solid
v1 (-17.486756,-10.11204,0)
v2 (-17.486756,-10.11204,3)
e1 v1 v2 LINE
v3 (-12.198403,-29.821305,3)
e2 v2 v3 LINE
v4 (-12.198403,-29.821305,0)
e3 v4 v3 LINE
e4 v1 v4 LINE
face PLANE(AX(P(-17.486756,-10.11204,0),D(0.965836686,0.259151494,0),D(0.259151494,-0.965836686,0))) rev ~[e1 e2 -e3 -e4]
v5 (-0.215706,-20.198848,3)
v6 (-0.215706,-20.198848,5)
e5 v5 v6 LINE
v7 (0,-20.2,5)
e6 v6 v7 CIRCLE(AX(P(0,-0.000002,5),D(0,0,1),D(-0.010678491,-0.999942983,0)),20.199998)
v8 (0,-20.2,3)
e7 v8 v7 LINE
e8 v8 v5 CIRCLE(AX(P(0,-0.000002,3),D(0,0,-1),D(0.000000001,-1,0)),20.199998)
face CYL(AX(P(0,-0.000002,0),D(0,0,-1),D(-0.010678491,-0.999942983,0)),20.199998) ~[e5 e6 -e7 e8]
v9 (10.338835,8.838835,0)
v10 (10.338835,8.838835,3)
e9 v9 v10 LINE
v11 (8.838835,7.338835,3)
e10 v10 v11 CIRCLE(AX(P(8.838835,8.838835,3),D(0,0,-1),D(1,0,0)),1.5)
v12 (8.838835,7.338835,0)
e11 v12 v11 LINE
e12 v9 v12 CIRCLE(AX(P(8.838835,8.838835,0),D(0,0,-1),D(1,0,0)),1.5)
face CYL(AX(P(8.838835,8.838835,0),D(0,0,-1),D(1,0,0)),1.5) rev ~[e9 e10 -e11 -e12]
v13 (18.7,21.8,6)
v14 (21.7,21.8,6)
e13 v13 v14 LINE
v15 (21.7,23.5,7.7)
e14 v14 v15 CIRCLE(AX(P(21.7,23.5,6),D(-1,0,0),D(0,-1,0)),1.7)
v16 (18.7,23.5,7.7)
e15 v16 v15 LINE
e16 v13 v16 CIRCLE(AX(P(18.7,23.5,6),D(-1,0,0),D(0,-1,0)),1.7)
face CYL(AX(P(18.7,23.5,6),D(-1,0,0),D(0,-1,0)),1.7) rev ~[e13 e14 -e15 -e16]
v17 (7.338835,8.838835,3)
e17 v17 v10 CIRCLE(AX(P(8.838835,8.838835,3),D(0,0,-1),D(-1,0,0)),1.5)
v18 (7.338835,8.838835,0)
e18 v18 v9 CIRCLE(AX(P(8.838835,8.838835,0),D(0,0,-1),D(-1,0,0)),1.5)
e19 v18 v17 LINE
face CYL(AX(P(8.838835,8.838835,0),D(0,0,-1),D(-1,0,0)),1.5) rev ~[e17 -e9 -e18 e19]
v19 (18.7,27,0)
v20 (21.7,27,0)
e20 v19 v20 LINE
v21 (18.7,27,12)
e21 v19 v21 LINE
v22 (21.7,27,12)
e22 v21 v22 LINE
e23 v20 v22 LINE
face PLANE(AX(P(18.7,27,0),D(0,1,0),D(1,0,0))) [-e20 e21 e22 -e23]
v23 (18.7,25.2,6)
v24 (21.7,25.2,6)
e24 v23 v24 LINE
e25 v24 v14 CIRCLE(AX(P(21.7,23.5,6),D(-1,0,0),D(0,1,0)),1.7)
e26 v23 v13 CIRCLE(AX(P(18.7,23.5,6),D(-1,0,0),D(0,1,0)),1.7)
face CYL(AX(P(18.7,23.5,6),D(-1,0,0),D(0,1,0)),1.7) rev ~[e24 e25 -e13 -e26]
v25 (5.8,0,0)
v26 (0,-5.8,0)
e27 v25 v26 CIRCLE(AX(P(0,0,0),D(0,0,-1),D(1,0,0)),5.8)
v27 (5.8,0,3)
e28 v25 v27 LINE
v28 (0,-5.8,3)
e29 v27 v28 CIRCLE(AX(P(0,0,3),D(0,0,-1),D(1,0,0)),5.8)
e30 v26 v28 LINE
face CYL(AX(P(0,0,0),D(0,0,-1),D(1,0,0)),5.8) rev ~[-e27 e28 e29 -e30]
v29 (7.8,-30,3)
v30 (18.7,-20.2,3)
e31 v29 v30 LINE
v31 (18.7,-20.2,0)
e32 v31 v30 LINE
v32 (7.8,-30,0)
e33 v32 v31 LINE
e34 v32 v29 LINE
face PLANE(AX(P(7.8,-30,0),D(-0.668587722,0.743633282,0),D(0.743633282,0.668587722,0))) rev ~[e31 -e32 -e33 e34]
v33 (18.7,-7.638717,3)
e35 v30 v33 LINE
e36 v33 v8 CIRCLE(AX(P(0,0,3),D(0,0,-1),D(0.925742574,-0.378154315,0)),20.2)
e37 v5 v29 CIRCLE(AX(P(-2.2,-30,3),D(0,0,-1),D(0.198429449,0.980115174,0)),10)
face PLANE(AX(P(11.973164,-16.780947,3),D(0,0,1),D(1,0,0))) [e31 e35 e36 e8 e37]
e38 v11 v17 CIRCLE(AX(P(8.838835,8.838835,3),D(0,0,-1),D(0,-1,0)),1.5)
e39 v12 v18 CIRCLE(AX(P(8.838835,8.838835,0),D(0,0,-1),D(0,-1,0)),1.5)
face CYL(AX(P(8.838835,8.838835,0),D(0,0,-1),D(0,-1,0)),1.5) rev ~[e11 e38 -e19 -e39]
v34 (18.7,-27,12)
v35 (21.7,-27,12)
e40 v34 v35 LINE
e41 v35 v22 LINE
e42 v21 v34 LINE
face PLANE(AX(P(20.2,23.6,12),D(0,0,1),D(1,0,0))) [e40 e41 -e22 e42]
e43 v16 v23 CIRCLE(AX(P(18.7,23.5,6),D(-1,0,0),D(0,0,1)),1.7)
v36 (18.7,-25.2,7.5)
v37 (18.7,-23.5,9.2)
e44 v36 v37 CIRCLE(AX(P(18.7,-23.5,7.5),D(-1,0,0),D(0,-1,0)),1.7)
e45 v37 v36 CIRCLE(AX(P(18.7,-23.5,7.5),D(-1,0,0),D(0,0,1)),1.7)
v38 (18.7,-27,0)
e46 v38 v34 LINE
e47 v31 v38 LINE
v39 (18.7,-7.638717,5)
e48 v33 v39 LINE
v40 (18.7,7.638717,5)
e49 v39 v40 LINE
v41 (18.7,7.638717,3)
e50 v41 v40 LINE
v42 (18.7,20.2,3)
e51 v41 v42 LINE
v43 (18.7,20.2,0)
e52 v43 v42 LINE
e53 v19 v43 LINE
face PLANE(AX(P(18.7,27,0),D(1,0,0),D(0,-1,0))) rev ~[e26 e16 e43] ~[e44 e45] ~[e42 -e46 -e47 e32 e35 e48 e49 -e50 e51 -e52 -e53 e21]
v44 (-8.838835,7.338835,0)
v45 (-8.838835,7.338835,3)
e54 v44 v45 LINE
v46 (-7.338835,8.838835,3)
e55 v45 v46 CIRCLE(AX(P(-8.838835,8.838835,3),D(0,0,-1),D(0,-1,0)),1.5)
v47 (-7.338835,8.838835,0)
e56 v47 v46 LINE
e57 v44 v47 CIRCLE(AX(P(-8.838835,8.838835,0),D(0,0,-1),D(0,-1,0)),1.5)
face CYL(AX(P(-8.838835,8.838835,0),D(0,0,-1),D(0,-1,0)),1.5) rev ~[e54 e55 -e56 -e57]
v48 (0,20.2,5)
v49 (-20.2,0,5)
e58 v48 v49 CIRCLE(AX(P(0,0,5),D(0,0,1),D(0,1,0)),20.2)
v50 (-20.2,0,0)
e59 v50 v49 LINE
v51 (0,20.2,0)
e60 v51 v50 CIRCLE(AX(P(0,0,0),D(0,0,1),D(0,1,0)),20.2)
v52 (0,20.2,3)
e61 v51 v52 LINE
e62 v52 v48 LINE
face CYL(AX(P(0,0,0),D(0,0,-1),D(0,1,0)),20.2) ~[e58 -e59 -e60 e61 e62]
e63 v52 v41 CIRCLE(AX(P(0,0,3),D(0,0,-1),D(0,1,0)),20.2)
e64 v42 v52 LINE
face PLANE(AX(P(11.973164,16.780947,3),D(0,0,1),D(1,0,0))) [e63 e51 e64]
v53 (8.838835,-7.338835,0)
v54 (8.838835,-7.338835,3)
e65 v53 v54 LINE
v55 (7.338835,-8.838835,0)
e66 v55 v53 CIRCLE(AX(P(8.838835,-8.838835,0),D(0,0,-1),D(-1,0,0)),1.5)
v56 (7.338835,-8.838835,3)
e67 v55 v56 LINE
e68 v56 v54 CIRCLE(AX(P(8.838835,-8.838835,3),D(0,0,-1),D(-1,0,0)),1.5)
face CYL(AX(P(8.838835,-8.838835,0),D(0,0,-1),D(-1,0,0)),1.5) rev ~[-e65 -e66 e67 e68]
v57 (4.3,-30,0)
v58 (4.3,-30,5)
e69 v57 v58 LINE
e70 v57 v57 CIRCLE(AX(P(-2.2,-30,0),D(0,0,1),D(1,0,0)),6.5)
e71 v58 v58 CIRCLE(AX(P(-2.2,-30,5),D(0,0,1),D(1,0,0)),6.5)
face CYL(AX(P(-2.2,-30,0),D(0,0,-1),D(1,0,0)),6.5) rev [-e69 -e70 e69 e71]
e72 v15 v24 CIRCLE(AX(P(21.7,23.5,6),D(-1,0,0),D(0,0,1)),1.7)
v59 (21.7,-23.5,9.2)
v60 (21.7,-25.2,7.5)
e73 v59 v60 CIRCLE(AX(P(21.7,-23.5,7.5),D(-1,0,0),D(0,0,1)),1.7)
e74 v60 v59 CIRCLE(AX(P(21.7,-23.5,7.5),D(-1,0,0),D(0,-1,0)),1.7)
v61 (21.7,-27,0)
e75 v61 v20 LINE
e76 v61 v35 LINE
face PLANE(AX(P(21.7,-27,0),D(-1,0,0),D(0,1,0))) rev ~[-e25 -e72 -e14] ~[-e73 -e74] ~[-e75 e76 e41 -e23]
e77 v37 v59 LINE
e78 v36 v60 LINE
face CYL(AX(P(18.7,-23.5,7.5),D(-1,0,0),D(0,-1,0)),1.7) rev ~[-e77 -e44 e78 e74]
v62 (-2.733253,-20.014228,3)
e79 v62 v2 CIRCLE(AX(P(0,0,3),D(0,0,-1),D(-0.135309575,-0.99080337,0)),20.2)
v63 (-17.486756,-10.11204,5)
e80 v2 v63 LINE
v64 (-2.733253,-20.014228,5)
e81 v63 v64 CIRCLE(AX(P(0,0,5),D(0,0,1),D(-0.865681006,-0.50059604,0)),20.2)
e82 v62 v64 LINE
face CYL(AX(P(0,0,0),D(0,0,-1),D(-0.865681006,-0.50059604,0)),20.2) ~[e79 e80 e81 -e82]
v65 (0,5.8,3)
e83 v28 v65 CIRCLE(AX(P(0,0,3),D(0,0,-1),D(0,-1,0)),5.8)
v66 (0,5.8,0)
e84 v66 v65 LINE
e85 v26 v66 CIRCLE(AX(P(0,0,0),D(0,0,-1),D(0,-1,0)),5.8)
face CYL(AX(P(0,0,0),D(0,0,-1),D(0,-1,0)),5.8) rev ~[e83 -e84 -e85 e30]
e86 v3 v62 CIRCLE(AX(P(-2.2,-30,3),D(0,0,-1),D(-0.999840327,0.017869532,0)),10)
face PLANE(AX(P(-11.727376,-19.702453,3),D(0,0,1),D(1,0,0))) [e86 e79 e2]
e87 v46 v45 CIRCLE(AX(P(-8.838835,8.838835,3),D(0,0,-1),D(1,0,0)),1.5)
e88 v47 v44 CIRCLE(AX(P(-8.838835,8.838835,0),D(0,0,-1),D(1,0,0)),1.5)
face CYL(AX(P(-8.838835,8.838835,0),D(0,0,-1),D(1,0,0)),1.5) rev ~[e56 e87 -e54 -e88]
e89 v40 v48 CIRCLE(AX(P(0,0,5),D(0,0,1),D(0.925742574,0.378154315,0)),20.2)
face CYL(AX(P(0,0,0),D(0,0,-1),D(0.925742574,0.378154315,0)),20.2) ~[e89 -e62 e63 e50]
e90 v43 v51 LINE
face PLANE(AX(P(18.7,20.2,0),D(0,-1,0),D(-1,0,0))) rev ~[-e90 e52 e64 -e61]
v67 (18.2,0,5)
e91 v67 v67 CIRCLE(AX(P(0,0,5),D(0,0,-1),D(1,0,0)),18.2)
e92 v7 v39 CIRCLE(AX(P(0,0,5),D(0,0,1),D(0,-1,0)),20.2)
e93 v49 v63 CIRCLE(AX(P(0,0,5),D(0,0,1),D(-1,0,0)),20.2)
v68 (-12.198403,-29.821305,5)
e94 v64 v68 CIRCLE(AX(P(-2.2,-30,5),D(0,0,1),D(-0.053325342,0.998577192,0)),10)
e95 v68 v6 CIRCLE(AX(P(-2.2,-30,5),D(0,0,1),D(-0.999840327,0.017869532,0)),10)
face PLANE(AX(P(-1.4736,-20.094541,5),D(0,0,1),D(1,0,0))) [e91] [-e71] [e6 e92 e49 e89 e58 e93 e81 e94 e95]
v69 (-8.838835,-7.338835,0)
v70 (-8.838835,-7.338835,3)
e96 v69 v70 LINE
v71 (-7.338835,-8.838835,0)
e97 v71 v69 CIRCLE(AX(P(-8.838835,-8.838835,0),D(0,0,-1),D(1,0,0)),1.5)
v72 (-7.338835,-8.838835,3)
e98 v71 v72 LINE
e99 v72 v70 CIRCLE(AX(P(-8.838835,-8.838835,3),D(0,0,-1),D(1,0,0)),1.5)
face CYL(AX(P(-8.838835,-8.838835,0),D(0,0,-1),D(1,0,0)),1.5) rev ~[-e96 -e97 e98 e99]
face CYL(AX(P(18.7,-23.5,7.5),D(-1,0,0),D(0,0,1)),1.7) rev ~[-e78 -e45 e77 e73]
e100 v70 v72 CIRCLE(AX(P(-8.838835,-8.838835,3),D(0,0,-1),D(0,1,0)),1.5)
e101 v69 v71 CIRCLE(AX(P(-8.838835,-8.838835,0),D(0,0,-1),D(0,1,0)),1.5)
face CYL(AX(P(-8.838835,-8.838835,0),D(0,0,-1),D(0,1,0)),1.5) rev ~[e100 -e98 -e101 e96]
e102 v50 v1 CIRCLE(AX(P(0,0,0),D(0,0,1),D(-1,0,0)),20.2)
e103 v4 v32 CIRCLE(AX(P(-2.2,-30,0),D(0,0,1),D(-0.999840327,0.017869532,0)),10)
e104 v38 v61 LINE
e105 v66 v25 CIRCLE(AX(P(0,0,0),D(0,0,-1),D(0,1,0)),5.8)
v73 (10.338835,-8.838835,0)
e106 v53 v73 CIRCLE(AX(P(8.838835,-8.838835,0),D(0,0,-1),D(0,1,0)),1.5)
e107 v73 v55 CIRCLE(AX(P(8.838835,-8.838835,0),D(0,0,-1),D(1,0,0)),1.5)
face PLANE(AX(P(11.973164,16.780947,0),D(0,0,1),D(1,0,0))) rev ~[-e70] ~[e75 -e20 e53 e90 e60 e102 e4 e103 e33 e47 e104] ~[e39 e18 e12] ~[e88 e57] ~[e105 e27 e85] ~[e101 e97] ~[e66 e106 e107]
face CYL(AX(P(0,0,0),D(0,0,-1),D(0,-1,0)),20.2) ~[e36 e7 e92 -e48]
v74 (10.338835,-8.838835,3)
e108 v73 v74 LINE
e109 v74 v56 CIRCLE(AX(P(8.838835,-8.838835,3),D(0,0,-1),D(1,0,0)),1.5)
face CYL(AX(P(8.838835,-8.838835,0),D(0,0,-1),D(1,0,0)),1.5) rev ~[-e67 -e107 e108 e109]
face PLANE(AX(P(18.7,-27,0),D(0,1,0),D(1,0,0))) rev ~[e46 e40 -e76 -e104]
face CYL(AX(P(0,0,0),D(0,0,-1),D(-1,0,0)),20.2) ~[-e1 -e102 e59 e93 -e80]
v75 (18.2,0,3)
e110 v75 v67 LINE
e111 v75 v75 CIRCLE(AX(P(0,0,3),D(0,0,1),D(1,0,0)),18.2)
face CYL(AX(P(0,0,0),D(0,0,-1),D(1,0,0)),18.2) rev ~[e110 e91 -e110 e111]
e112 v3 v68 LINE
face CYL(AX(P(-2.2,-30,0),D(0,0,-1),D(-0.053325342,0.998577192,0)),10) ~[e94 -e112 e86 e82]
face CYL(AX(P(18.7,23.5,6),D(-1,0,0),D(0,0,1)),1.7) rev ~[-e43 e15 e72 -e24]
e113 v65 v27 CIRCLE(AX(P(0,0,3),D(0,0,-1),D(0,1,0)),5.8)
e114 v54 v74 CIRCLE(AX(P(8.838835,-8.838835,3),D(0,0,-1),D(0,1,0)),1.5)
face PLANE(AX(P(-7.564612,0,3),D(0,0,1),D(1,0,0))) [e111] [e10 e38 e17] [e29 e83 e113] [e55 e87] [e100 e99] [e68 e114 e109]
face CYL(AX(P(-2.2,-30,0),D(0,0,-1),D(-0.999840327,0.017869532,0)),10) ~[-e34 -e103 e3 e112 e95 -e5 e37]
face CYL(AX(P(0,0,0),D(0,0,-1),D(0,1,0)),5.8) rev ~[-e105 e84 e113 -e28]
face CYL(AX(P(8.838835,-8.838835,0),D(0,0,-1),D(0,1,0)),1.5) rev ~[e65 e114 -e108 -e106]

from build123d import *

# Parameters (mm, degrees)
F0_W     = 3
F0_H     = 6.8
F1_DEPTH = 12
F2_DEPTH = 5
F3_DEPTH = 3
F0_R     = 6.5
F4_DEPTH = 5
F5_DEPTH = 3
F7_DEPTH = 25
F8_DEPTH = 25
F9_DEPTH = 3


with BuildPart() as f1:
    # F0 (on Top) → F1 (new body)
    with BuildSketch(Plane.XY):
        with Locations((20.2, 23.6)):
            Rectangle(F0_W, F0_H)
        with BuildLine():
            Line((18.7, 20.2), (18.7, 7.6387171698))
            ThreePointArc((18.7, 7.6387171698), (19.8214530244, 3.8923000912), (20.2, 0))
            Line((20.2, 0), (21.7, 0))
            Line((21.7, 0), (21.7, 20.2))
            Line((21.7, 20.2), (18.7, 20.2))
        make_face()
        with BuildLine():
            Line((21.7, 0), (20.2, 0))
            ThreePointArc((20.2, 0), (19.8214530244, -3.8923000912), (18.7, -7.6387171698))
            Line((18.7, -7.6387171698), (18.7, -20.2))
            Line((18.7, -20.2), (21.7, -20.2))
            Line((21.7, -20.2), (21.7, 0))
        make_face()
        with Locations((20.2, -23.6)):
            Rectangle(F0_W, F0_H)
        with BuildLine():
            ThreePointArc((20.2, 0), (19.8214530244, 3.8923000912), (18.7, 7.6387171698))
            Line((18.7, 7.6387171698), (18.7, 0))
            Line((18.7, 0), (20.2, 0))
        make_face()
        with BuildLine():
            ThreePointArc((18.7, -7.6387171698), (19.8214530244, -3.8923000912), (20.2, 0))
            Line((20.2, 0), (18.7, 0))
            Line((18.7, 0), (18.7, -7.6387171698))
        make_face()
    extrude(amount=F1_DEPTH)

    # F0 (on Top) → F2 (join)
    with BuildSketch(Plane.XY):
        with BuildLine():
            Line((0, 18.2), (0, 20.2))
            ThreePointArc((0, 20.2), (-14.28355698, 14.28355698), (-20.2, 0))
            Line((-20.2, 0), (-17.4867563263, -10.1120400111))
            ThreePointArc((-17.4867563263, -10.1120400111), (-11.2572434768, -16.7724318244), (-2.7332534209, -20.0142280825))
            ThreePointArc((-2.7332534209, -20.0142280825), (-1.4686306009, -20.0267809208), (-0.215705511, -20.1988482625))
            ThreePointArc((-0.215705511, -20.1988482625), (-0.1078542929, -20.1997120636), (0, -20.2))
            Line((0, -20.2), (0, -18.2))
            ThreePointArc((0, -18.2), (-18.2, 0), (0, 18.2))
        make_face()
        with BuildLine():
            ThreePointArc((18.7, 7.6387171698), (11.2636120576, 16.7681556355), (0, 20.2))
            Line((0, 20.2), (0, 18.2))
            ThreePointArc((0, 18.2), (12.8693434176, 12.8693434176), (18.2, 0))
            ThreePointArc((18.2, 0), (12.8693434176, -12.8693434176), (0, -18.2))
            Line((0, -18.2), (0, -20.2))
            ThreePointArc((0, -20.2), (11.2636120576, -16.7681556355), (18.7, -7.6387171698))
            Line((18.7, -7.6387171698), (18.7, 0))
            Line((18.7, 0), (18.7, 7.6387171698))
        make_face()
        with BuildLine():
            Line((-17.4867563263, -10.1120400111), (-20.2, 0))
            ThreePointArc((-20.2, 0), (-19.5099010478, -5.23486018), (-17.4867563263, -10.1120400111))
        make_face()
    extrude(amount=F2_DEPTH)

    # F0 (on Top) → F3 (join)
    with BuildSketch(Plane.XY):
        with BuildLine():
            Line((0, 8.8388347648), (0, 18.2))
            ThreePointArc((0, 18.2), (-18.2, 0), (0, -18.2))
            Line((0, -18.2), (0, -8.8388347648))
            Line((0, -8.8388347648), (-7.3388347648, -8.8388347648))
            ThreePointArc((-7.3388347648, -8.8388347648), (-9.8994949366, -9.8994949366), (-8.8388347648, -7.3388347648))
            Line((-8.8388347648, -7.3388347648), (-8.8388347648, 7.3388347648))
            ThreePointArc((-8.8388347648, 7.3388347648), (-9.8994949366, 9.8994949366), (-7.3388347648, 8.8388347648))
            Line((-7.3388347648, 8.8388347648), (0, 8.8388347648))
        make_face()
        with BuildLine():
            Line((7.3388347648, 8.8388347648), (0, 8.8388347648))
            Line((0, 8.8388347648), (0, 5.8))
            ThreePointArc((0, 5.8), (4.1012193309, 4.1012193309), (5.8, 0))
            ThreePointArc((5.8, 0), (4.1012193309, -4.1012193309), (0, -5.8))
            Line((0, -5.8), (0, -8.8388347648))
            Line((0, -8.8388347648), (7.3388347648, -8.8388347648))
            ThreePointArc((7.3388347648, -8.8388347648), (7.7781745931, -7.7781745931), (8.8388347648, -7.3388347648))
            Line((8.8388347648, -7.3388347648), (8.8388347648, 7.3388347648))
            ThreePointArc((8.8388347648, 7.3388347648), (7.7781745931, 7.7781745931), (7.3388347648, 8.8388347648))
        make_face()
        with BuildLine():
            Line((0, 5.8), (0, 8.8388347648))
            Line((0, 8.8388347648), (-7.3388347648, 8.8388347648))
            ThreePointArc((-7.3388347648, 8.8388347648), (-7.7781745931, 7.7781745931), (-8.8388347648, 7.3388347648))
            Line((-8.8388347648, 7.3388347648), (-8.8388347648, -7.3388347648))
            ThreePointArc((-8.8388347648, -7.3388347648), (-7.7781745931, -7.7781745931), (-7.3388347648, -8.8388347648))
            Line((-7.3388347648, -8.8388347648), (0, -8.8388347648))
            Line((0, -8.8388347648), (0, -5.8))
            ThreePointArc((0, -5.8), (-5.8, 0), (0, 5.8))
        make_face()
        with BuildLine():
            ThreePointArc((18.2, 0), (12.8693434176, 12.8693434176), (0, 18.2))
            Line((0, 18.2), (0, 8.8388347648))
            Line((0, 8.8388347648), (7.3388347648, 8.8388347648))
            ThreePointArc((7.3388347648, 8.8388347648), (8.8388347648, 10.3388347648), (10.3388347648, 8.8388347648))
            ThreePointArc((10.3388347648, 8.8388347648), (9.8994949366, 7.7781745931), (8.8388347648, 7.3388347648))
            Line((8.8388347648, 7.3388347648), (8.8388347648, -7.3388347648))
            ThreePointArc((8.8388347648, -7.3388347648), (9.8994949366, -7.7781745931), (10.3388347648, -8.8388347648))
            ThreePointArc((10.3388347648, -8.8388347648), (8.8388347648, -10.3388347648), (7.3388347648, -8.8388347648))
            Line((7.3388347648, -8.8388347648), (0, -8.8388347648))
            Line((0, -8.8388347648), (0, -18.2))
            ThreePointArc((0, -18.2), (12.8693434176, -12.8693434176), (18.2, 0))
        make_face()
    extrude(amount=F3_DEPTH)

    # F0 (on Top) → F4 (join)
    with BuildSketch(Plane.XY):
        with BuildLine():
            ThreePointArc((-0.215705511, -20.1988482625), (-1.4686306009, -20.0267809208), (-2.7332534209, -20.0142280825))
            ThreePointArc((-2.7332534209, -20.0142280825), (-1.4773661863, -20.14590254), (-0.215705511, -20.1988482625))
        make_face()
        with BuildLine():
            ThreePointArc((-0.215705511, -20.1988482625), (-1.4773661863, -20.14590254), (-2.7332534209, -20.0142280825))
            ThreePointArc((-2.7332534209, -20.0142280825), (-9.3953899149, -23.0554795722), (-12.1984032717, -29.8213046815))
            ThreePointArc((-12.1984032717, -29.8213046815), (-2.2893512261, -39.99960081), (7.8, -30))
            ThreePointArc((7.8, -30), (5.5408961009, -23.6692395753), (-0.215705511, -20.1988482625))
        make_face()
        with Locations((-2.2, -30)):
            Circle(F0_R, mode=Mode.SUBTRACT)
    extrude(amount=F4_DEPTH)

    # F0 (on Top) → F5 (join)
    with BuildSketch(Plane.XY):
        with BuildLine():
            ThreePointArc((-2.7332534209, -20.0142280825), (-11.2572434768, -16.7724318244), (-17.4867563263, -10.1120400111))
            Line((-17.4867563263, -10.1120400111), (-12.1984032717, -29.8213046815))
            ThreePointArc((-12.1984032717, -29.8213046815), (-9.3953899149, -23.0554795722), (-2.7332534209, -20.0142280825))
        make_face()
        with BuildLine():
            Line((18.7, -20.2), (18.7, -7.6387171698))
            ThreePointArc((18.7, -7.6387171698), (11.2636120576, -16.7681556355), (0, -20.2))
            Line((0, -20.2), (18.7, -20.2))
        make_face()
        with BuildLine():
            Line((18.7, -20.2), (0, -20.2))
            ThreePointArc((0, -20.2), (-0.1078542929, -20.1997120636), (-0.215705511, -20.1988482625))
            ThreePointArc((-0.215705511, -20.1988482625), (5.5408961009, -23.6692395753), (7.8, -30))
            Line((7.8, -30), (18.7, -20.2))
        make_face()
    extrude(amount=F5_DEPTH)

    # F6 (on face) → F7 (cut)
    with BuildSketch(Plane(origin=(18.7, 0, 0), x_dir=(0, -1, 0), z_dir=(-1, 0, 0))):
        with BuildLine():
            Line((-25.2, 6), (-23.5, 6))
            Line((-23.5, 6), (-23.5, 7.7))
            ThreePointArc((-23.5, 7.7), (-24.702081528, 7.202081528), (-25.2, 6))
        make_face()
        with BuildLine():
            Line((-21.8, 6), (-23.5, 6))
            Line((-23.5, 6), (-25.2, 6))
            ThreePointArc((-25.2, 6), (-23.5, 4.3), (-21.8, 6))
        make_face()
        with BuildLine():
            Line((-23.5, 7.7), (-23.5, 6))
            Line((-23.5, 6), (-21.8, 6))
            ThreePointArc((-21.8, 6), (-22.297918472, 7.202081528), (-23.5, 7.7))
        make_face()
    extrude(amount=-F7_DEPTH, mode=Mode.SUBTRACT)

    # F6 (on face) → F8 (cut)
    with BuildSketch(Plane(origin=(18.7, 0, 0), x_dir=(0, -1, 0), z_dir=(-1, 0, 0))):
        with BuildLine():
            Line((-21.8, 6), (-23.5, 6))
            Line((-23.5, 6), (-25.2, 6))
            ThreePointArc((-25.2, 6), (-23.5, 4.3), (-21.8, 6))
        make_face()
        with BuildLine():
            Line((-25.2, 6), (-23.5, 6))
            Line((-23.5, 6), (-23.5, 7.7))
            ThreePointArc((-23.5, 7.7), (-24.702081528, 7.202081528), (-25.2, 6))
        make_face()
        with BuildLine():
            Line((-23.5, 7.7), (-23.5, 6))
            Line((-23.5, 6), (-21.8, 6))
            ThreePointArc((-21.8, 6), (-22.297918472, 7.202081528), (-23.5, 7.7))
        make_face()
        with BuildLine():
            ThreePointArc((23.5, 9.2), (22.297918472, 6.297918472), (25.2, 7.5))
            ThreePointArc((25.2, 7.5), (24.702081528, 8.702081528), (23.5, 9.2))
        make_face()
    extrude(amount=-F8_DEPTH, mode=Mode.SUBTRACT)

    # F0 (on Top) → F9 (join)
    with BuildSketch(Plane.XY):
        with BuildLine():
            Line((18.7, 20.2), (0, 20.2))
            ThreePointArc((0, 20.2), (11.2636120576, 16.7681556355), (18.7, 7.6387171698))
            Line((18.7, 7.6387171698), (18.7, 20.2))
        make_face()
    extrude(amount=F9_DEPTH)


with BuildPart() as f10_1:
    # F10: copy of F1
    add(f1.part)


solid = f10_1.part
